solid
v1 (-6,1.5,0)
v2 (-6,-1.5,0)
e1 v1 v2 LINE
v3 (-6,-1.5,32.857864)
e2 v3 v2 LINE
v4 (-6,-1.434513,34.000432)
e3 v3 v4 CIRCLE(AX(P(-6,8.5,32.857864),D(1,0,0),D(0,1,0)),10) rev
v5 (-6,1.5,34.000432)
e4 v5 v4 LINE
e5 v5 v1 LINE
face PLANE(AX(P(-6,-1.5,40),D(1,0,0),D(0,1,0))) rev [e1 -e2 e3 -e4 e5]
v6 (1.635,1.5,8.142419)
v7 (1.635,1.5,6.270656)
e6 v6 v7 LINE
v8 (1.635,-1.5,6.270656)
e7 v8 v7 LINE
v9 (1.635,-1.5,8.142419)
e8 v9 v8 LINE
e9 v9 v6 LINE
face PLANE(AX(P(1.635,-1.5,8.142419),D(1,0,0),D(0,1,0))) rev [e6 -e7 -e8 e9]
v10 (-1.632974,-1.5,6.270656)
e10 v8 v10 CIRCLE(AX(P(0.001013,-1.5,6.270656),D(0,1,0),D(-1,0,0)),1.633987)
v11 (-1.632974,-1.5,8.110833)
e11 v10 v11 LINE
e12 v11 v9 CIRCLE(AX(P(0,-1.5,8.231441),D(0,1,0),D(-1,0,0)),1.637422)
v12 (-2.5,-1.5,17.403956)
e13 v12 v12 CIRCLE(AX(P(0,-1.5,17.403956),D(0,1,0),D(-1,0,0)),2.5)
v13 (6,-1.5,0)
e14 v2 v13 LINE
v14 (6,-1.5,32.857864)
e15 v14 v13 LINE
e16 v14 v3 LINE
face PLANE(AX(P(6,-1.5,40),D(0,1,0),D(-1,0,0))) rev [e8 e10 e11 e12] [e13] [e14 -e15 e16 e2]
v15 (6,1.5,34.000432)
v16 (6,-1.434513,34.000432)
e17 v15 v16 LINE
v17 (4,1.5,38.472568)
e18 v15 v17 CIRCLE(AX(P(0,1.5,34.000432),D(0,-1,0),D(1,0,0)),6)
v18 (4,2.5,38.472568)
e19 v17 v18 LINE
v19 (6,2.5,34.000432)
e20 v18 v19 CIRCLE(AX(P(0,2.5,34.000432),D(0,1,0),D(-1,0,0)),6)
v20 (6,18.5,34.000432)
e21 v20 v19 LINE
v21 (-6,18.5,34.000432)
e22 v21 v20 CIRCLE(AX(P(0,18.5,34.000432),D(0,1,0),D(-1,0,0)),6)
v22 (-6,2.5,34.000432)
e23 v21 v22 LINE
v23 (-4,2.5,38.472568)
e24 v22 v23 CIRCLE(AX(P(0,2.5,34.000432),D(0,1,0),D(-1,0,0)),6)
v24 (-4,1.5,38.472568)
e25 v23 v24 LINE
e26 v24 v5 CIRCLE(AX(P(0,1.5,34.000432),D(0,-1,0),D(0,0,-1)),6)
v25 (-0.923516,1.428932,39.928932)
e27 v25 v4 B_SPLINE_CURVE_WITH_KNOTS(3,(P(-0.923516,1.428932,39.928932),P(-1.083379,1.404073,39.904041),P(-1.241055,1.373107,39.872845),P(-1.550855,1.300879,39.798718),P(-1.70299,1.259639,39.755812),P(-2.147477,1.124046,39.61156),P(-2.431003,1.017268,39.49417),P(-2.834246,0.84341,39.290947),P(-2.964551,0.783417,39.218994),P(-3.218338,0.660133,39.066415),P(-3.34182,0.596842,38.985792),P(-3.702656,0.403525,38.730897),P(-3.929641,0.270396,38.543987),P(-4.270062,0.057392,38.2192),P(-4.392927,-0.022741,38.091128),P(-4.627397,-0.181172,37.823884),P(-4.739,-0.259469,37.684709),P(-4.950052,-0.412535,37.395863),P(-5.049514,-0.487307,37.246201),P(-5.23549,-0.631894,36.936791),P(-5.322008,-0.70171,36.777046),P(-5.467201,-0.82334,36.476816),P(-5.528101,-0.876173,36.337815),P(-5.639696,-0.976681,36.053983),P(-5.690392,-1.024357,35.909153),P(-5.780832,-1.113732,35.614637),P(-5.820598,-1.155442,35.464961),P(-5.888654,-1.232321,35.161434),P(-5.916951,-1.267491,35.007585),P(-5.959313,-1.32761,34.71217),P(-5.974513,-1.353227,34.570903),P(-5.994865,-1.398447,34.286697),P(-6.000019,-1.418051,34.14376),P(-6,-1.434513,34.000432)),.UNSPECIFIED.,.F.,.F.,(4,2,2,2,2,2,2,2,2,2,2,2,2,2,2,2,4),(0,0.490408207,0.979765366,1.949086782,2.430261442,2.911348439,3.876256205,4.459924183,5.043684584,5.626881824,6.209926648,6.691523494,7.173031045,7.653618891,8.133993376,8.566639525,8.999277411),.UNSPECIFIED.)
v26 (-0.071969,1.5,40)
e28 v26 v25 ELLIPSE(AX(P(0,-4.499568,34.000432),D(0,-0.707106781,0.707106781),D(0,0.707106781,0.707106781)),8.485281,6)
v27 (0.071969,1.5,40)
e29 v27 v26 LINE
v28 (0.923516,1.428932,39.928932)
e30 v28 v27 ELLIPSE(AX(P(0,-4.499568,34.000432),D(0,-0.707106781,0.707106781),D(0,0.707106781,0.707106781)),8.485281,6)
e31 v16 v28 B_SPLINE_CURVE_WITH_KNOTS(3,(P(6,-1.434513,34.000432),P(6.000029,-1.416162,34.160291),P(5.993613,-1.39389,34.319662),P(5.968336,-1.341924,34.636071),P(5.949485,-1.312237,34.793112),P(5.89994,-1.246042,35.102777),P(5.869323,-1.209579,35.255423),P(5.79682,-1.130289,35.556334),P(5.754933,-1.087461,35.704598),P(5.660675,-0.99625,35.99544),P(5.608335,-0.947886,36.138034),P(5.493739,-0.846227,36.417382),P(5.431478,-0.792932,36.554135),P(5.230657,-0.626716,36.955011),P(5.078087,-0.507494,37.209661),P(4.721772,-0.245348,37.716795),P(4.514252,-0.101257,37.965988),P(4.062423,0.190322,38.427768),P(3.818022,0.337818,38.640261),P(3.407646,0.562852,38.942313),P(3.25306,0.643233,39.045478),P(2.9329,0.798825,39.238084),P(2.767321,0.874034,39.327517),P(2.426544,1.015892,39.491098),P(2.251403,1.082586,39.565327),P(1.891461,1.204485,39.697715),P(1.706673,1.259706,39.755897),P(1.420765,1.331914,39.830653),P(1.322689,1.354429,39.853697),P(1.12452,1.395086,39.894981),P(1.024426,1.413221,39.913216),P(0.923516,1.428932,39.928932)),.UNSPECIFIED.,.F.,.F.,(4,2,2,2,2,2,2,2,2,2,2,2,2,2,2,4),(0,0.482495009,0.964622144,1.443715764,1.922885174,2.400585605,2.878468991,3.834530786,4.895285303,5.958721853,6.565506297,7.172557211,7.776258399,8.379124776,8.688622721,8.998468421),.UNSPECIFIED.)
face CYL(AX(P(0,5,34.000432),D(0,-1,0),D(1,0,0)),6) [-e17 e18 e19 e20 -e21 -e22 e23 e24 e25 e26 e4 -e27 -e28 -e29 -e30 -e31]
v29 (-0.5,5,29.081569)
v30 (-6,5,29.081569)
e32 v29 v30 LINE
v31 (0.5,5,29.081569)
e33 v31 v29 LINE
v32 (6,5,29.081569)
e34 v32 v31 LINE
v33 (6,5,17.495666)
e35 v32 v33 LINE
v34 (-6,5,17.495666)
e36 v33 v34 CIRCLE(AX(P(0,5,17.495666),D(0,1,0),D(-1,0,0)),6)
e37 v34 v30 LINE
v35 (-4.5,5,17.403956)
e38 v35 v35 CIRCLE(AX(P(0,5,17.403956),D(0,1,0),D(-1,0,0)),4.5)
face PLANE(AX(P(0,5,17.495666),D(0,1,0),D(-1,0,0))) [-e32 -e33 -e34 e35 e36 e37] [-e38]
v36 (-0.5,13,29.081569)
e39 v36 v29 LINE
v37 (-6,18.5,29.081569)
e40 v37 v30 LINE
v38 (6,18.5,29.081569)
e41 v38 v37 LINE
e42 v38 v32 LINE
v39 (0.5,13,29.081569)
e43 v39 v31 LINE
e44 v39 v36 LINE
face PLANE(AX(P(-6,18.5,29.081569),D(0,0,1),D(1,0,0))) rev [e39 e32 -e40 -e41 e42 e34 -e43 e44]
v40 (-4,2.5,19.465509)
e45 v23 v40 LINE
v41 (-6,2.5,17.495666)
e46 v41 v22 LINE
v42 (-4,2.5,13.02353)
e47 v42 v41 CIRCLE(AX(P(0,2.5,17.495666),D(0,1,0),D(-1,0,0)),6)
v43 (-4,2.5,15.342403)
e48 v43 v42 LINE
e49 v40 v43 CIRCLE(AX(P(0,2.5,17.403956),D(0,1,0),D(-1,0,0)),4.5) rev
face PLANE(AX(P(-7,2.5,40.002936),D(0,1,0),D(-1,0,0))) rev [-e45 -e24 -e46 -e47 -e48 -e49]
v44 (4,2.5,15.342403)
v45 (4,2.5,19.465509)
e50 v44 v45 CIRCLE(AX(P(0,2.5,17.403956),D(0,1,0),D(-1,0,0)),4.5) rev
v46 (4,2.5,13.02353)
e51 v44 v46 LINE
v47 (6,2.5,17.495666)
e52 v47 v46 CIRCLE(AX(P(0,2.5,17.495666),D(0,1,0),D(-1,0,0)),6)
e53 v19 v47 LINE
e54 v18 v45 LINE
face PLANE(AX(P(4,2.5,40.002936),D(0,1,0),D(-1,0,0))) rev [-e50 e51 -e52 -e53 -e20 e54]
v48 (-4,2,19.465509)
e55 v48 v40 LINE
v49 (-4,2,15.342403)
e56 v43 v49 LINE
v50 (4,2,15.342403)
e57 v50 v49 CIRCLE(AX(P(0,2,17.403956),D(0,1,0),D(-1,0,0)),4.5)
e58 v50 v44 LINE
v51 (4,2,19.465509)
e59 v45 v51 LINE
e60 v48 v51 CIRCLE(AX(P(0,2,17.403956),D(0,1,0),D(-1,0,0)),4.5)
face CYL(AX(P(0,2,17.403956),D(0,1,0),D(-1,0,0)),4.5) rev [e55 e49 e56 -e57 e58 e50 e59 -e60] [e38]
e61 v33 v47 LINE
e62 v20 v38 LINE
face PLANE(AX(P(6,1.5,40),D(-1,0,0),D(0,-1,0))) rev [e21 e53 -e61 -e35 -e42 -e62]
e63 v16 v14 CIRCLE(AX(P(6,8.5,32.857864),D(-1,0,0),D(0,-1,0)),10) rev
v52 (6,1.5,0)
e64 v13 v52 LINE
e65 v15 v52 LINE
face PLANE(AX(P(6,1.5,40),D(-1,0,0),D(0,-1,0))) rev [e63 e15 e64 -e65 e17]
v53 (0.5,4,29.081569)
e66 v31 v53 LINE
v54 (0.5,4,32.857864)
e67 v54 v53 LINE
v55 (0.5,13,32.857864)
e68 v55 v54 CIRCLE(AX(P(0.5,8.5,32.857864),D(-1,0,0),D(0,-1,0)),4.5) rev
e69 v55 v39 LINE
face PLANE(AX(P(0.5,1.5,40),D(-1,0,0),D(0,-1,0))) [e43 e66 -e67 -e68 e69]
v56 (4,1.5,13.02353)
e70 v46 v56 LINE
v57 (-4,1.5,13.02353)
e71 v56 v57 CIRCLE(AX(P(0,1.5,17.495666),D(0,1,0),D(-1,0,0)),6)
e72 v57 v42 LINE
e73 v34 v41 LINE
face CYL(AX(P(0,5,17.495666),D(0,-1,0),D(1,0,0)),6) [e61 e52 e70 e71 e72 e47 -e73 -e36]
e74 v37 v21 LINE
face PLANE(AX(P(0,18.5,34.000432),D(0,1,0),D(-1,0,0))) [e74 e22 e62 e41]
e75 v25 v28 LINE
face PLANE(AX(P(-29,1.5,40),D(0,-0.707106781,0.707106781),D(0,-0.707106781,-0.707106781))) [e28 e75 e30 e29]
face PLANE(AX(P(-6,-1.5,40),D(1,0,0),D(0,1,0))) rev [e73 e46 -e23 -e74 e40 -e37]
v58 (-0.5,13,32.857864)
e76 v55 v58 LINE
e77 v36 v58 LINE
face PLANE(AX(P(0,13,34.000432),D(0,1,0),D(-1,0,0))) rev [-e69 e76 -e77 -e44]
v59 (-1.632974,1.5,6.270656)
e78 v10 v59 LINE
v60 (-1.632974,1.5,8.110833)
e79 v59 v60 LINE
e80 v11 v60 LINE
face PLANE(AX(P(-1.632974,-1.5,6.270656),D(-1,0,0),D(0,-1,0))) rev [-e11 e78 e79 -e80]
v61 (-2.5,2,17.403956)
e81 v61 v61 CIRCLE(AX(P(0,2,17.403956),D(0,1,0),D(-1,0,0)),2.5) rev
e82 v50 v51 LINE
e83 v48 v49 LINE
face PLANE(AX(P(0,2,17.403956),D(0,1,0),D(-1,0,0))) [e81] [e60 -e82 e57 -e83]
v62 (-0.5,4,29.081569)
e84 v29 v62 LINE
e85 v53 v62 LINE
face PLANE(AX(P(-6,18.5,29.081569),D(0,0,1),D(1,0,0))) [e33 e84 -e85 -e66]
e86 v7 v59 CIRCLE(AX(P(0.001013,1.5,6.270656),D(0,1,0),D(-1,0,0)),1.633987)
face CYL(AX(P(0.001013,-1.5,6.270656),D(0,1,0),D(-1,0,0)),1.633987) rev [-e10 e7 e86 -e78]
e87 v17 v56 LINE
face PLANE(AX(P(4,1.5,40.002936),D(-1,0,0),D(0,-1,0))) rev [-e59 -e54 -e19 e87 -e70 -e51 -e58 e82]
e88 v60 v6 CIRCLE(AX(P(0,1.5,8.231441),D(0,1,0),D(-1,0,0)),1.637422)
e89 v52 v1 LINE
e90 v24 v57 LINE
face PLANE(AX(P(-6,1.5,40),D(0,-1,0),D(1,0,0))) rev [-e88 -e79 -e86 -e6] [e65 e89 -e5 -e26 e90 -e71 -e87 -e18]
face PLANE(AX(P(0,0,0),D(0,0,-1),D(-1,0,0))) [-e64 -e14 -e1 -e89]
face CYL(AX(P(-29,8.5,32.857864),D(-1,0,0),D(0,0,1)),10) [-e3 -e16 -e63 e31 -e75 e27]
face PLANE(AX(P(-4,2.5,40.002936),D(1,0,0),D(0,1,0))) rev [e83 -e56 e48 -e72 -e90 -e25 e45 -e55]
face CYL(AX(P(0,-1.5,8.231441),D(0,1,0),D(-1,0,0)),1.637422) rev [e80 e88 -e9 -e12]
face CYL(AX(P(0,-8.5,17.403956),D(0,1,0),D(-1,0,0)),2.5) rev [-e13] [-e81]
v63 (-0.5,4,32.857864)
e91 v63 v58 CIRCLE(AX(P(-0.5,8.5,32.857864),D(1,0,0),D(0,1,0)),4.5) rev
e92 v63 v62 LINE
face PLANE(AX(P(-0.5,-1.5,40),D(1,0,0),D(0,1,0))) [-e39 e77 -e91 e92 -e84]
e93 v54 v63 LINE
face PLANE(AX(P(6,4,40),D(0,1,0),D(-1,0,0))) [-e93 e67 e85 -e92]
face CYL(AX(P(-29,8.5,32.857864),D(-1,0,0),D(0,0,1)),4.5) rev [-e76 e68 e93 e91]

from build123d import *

# Parameters (mm, degrees)
BOSS_EXTRUDE1_DEPTH = 40
CUT_EXTRUDE1_DEPTH  = 35
FILLET1_R           = 10
BOSS_EXTRUDE2_DEPTH = 3.5
CUT_EXTRUDE5_DEPTH  = 41.96687114982433
BOSS_EXTRUDE3_START = 13.5
BOSS_EXTRUDE3_DEPTH = 13.5
SKETCH10_R          = 2.4999999999999996
CUT_EXTRUDE6_DEPTH  = 13.5
SKETCH11_R          = 4.500000000000001
CUT_EXTRUDE7_DEPTH  = 3
SKETCH12_R          = 1.6339869281045687
CUT_EXTRUDE8_DEPTH  = 44.87521560524114
SHELL3_START        = -0.5
SHELL3_DEPTH        = 1
CUT_EXTRUDE9_DEPTH  = 45.47791075024091


# Read off the part's stored shape, not the designer's step: Shell3
with BuildPart() as part:
    # Sketch1 → Boss-Extrude1 (new body)
    with BuildSketch(Plane.XY):
        Polygon((6.0000000000003, 1.5000000000000038), (6.000000000000302, -1.5), (-6.0000000000000036, -1.5000000000000016), (-6.000000000000004, 1.4999999999999993), align=None)
    extrude(amount=BOSS_EXTRUDE1_DEPTH)

    # Sketch3 → Cut-Extrude1 (cut)
    with BuildSketch(Plane(origin=(6.000000000000301, 3.47e-15, 0), x_dir=(0, 0, -1), z_dir=(1, 5.8e-16, 0))):
        Polygon((-40, 1.5000000000000002), (-36.99999999999992, -1.5000000000000036), (-40, -1.5000000000000036), align=None)
    extrude(amount=-CUT_EXTRUDE1_DEPTH, mode=Mode.SUBTRACT)

    # Fillet1
    fillet1_edges = [part.edges().sort_by_distance(p)[0] for p in [
        (1.4921e-13, -1.5000000000000036, 36.99999999999992),
    ]]
    fillet(fillet1_edges, radius=FILLET1_R)

    # Sketch5 → Boss-Extrude2 (add)
    with BuildSketch(Plane(origin=(-5.4e-16, 1.5000000000000016, 0), x_dir=(1, 3.6e-16, 0), z_dir=(-3.6e-16, 1, 0))):
        with BuildLine():
            Line((6.000000000000301, -17.495666027521235), (6.000000000000301, -34.00043164524958))
            ThreePointArc((6.000000000000301, -34.00043164524958), (3.235e-14, -40.00043164524985), (-6.000000000000234, -34.00043164524958))
            Line((-6.000000000000234, -34.00043164524958), (-6.000000000000234, -17.495666027521235))
            ThreePointArc((-6.000000000000234, -17.495666027521235), (3.382e-14, -11.495666027520969), (6.000000000000301, -17.495666027521235))
        make_face()
    extrude(amount=BOSS_EXTRUDE2_DEPTH)

    # Sketch8 → Cut-Extrude5 (cut, through all)
    with BuildSketch(Plane(origin=(-1.81e-15, 5.000000000000002, 0), x_dir=(1, 3.6e-16, 0), z_dir=(-3.6e-16, 1, 0))):
        with BuildLine():
            Line((-6.000000000000004, -40), (-0.07196913699948215, -40))
            ThreePointArc((-0.07196913699948213, -40.00000000000001), (-4.268009771661707, -38.217550636812796), (-6.000000000000242, -34.00043164524961))
            Line((-6.0000000000002425, -34.00043164524961), (-6.000000000000004, -40))
        make_face()
        with BuildLine():
            ThreePointArc((6.000000000000299, -34.00043164524958), (4.268009771661984, -38.217550636812554), (0.07196913700016037, -40))
            Line((0.07196913700015983, -40), (6.000000000000301, -40))
            Line((6.000000000000301, -40), (6.000000000000301, -34.00043164524958))
        make_face()
    extrude(amount=-CUT_EXTRUDE5_DEPTH, mode=Mode.SUBTRACT)

    # Sketch9 → Boss-Extrude3 (add)
    with BuildSketch(Plane(origin=(-1.81e-15, 5.000000000000002, 0), x_dir=(1, 3.6e-16, 0), z_dir=(-3.6e-16, 1, 0)).offset(BOSS_EXTRUDE3_START)):
        with BuildLine():
            Line((-6.000000000000234, -29.081568785258), (6.000000000000301, -29.081568785258))
            Line((6.000000000000301, -29.081568785258), (6.000000000000301, -34.00043164524958))
            ThreePointArc((6.000000000000301, -34.00043164524958), (3.272e-14, -40.00043164524985), (-6.000000000000234, -34.00043164524958))
            Line((-6.000000000000234, -34.00043164524958), (-6.000000000000234, -29.081568785258))
        make_face()
    extrude(amount=-BOSS_EXTRUDE3_DEPTH)

    # Sketch10 → Cut-Extrude6 (cut)
    with BuildSketch(Plane(origin=(-1.81e-15, 5.000000000000002, 0), x_dir=(1, 3.6e-16, 0), z_dir=(-3.6e-16, 1, 0))):
        with Locations(Location((1e-17, -17.403956104439153, 0), (0, 0, 180))):
            Circle(SKETCH10_R)
    extrude(amount=-CUT_EXTRUDE6_DEPTH, mode=Mode.SUBTRACT)

    # Sketch11 → Cut-Extrude7 (cut)
    with BuildSketch(Plane(origin=(-1.81e-15, 5.000000000000002, 0), x_dir=(1, 3.6e-16, 0), z_dir=(-3.6e-16, 1, 0))):
        with Locations(Location((1e-17, -17.403956104439153, 0), (0, 0, 180))):
            Circle(SKETCH11_R)
    extrude(amount=-CUT_EXTRUDE7_DEPTH, mode=Mode.SUBTRACT)

    # Sketch12 → Cut-Extrude8 (cut, through all)
    with BuildSketch(Plane(origin=(-5.4e-16, 1.5000000000000016, 0), x_dir=(1, 3.6e-16, 0), z_dir=(-3.6e-16, 1, 0))):
        with Locations((1e-17, -17.403956104439153)):
            Circle(SKETCH12_R)
        with BuildLine():
            Line((1.6350000000000315, -8.142419448359679), (1.6350000000000313, -6.270656428732565))
            ThreePointArc((1.6350000000000313, -6.270656428732565), (0.00101307189543799, -4.636669500627991), (-1.6329738562091354, -6.270656428732585))
            Line((-1.6329738562091354, -6.270656428732585), (-1.6329738562091352, -8.110833214748085))
            ThreePointArc((-1.6329738562091352, -8.110833214748085), (-0.01582557591703412, -9.86878595405819), (1.6350000000000315, -8.142419448359679))
        make_face()
    extrude(amount=-CUT_EXTRUDE8_DEPTH, mode=Mode.SUBTRACT)

    # Shell3 outline → Shell3 (cut)
    with BuildSketch(Plane.YZ.offset(SHELL3_START)):
        with BuildLine():
            Line((4, 29.081568785), (13, 29.081568785))
            Line((13, 29.081568785), (13, 32.857864376))
            ThreePointArc((13, 32.857864376), (8.5, 37.357864376), (4, 32.857864376))
            Line((4, 32.857864376), (4, 29.081568785))
        make_face()
    extrude(amount=SHELL3_DEPTH, mode=Mode.SUBTRACT)

    # Sketch18 → Cut-Extrude9 (cut, through all)
    with BuildSketch(Plane(origin=(0, 0, 0), x_dir=(-1, 0, 0), z_dir=(0, 0, -1))):
        Polygon((6.000000000000441, 1.5), (6.000000000000442, -1.499999999999904), (-5.999999999999879, -1.4999999999999782), (-5.999999999999879, 1.5000000000000229), (-4.000000000000168, 1.5000000000001654), (-4.000000000000022, 2.5000000000001656), (-7.000000000000024, 2.500000000000053), (-7.000000000000022, -2.499999999999947), (7, -2.4999999999998628), (6.999999999999999, 2.500000000000055), (4.000000000000475, 2.5000000000000546), (4.000000000000459, 1.5), align=None)
    extrude(amount=-CUT_EXTRUDE9_DEPTH, mode=Mode.SUBTRACT)


solid = part.part
